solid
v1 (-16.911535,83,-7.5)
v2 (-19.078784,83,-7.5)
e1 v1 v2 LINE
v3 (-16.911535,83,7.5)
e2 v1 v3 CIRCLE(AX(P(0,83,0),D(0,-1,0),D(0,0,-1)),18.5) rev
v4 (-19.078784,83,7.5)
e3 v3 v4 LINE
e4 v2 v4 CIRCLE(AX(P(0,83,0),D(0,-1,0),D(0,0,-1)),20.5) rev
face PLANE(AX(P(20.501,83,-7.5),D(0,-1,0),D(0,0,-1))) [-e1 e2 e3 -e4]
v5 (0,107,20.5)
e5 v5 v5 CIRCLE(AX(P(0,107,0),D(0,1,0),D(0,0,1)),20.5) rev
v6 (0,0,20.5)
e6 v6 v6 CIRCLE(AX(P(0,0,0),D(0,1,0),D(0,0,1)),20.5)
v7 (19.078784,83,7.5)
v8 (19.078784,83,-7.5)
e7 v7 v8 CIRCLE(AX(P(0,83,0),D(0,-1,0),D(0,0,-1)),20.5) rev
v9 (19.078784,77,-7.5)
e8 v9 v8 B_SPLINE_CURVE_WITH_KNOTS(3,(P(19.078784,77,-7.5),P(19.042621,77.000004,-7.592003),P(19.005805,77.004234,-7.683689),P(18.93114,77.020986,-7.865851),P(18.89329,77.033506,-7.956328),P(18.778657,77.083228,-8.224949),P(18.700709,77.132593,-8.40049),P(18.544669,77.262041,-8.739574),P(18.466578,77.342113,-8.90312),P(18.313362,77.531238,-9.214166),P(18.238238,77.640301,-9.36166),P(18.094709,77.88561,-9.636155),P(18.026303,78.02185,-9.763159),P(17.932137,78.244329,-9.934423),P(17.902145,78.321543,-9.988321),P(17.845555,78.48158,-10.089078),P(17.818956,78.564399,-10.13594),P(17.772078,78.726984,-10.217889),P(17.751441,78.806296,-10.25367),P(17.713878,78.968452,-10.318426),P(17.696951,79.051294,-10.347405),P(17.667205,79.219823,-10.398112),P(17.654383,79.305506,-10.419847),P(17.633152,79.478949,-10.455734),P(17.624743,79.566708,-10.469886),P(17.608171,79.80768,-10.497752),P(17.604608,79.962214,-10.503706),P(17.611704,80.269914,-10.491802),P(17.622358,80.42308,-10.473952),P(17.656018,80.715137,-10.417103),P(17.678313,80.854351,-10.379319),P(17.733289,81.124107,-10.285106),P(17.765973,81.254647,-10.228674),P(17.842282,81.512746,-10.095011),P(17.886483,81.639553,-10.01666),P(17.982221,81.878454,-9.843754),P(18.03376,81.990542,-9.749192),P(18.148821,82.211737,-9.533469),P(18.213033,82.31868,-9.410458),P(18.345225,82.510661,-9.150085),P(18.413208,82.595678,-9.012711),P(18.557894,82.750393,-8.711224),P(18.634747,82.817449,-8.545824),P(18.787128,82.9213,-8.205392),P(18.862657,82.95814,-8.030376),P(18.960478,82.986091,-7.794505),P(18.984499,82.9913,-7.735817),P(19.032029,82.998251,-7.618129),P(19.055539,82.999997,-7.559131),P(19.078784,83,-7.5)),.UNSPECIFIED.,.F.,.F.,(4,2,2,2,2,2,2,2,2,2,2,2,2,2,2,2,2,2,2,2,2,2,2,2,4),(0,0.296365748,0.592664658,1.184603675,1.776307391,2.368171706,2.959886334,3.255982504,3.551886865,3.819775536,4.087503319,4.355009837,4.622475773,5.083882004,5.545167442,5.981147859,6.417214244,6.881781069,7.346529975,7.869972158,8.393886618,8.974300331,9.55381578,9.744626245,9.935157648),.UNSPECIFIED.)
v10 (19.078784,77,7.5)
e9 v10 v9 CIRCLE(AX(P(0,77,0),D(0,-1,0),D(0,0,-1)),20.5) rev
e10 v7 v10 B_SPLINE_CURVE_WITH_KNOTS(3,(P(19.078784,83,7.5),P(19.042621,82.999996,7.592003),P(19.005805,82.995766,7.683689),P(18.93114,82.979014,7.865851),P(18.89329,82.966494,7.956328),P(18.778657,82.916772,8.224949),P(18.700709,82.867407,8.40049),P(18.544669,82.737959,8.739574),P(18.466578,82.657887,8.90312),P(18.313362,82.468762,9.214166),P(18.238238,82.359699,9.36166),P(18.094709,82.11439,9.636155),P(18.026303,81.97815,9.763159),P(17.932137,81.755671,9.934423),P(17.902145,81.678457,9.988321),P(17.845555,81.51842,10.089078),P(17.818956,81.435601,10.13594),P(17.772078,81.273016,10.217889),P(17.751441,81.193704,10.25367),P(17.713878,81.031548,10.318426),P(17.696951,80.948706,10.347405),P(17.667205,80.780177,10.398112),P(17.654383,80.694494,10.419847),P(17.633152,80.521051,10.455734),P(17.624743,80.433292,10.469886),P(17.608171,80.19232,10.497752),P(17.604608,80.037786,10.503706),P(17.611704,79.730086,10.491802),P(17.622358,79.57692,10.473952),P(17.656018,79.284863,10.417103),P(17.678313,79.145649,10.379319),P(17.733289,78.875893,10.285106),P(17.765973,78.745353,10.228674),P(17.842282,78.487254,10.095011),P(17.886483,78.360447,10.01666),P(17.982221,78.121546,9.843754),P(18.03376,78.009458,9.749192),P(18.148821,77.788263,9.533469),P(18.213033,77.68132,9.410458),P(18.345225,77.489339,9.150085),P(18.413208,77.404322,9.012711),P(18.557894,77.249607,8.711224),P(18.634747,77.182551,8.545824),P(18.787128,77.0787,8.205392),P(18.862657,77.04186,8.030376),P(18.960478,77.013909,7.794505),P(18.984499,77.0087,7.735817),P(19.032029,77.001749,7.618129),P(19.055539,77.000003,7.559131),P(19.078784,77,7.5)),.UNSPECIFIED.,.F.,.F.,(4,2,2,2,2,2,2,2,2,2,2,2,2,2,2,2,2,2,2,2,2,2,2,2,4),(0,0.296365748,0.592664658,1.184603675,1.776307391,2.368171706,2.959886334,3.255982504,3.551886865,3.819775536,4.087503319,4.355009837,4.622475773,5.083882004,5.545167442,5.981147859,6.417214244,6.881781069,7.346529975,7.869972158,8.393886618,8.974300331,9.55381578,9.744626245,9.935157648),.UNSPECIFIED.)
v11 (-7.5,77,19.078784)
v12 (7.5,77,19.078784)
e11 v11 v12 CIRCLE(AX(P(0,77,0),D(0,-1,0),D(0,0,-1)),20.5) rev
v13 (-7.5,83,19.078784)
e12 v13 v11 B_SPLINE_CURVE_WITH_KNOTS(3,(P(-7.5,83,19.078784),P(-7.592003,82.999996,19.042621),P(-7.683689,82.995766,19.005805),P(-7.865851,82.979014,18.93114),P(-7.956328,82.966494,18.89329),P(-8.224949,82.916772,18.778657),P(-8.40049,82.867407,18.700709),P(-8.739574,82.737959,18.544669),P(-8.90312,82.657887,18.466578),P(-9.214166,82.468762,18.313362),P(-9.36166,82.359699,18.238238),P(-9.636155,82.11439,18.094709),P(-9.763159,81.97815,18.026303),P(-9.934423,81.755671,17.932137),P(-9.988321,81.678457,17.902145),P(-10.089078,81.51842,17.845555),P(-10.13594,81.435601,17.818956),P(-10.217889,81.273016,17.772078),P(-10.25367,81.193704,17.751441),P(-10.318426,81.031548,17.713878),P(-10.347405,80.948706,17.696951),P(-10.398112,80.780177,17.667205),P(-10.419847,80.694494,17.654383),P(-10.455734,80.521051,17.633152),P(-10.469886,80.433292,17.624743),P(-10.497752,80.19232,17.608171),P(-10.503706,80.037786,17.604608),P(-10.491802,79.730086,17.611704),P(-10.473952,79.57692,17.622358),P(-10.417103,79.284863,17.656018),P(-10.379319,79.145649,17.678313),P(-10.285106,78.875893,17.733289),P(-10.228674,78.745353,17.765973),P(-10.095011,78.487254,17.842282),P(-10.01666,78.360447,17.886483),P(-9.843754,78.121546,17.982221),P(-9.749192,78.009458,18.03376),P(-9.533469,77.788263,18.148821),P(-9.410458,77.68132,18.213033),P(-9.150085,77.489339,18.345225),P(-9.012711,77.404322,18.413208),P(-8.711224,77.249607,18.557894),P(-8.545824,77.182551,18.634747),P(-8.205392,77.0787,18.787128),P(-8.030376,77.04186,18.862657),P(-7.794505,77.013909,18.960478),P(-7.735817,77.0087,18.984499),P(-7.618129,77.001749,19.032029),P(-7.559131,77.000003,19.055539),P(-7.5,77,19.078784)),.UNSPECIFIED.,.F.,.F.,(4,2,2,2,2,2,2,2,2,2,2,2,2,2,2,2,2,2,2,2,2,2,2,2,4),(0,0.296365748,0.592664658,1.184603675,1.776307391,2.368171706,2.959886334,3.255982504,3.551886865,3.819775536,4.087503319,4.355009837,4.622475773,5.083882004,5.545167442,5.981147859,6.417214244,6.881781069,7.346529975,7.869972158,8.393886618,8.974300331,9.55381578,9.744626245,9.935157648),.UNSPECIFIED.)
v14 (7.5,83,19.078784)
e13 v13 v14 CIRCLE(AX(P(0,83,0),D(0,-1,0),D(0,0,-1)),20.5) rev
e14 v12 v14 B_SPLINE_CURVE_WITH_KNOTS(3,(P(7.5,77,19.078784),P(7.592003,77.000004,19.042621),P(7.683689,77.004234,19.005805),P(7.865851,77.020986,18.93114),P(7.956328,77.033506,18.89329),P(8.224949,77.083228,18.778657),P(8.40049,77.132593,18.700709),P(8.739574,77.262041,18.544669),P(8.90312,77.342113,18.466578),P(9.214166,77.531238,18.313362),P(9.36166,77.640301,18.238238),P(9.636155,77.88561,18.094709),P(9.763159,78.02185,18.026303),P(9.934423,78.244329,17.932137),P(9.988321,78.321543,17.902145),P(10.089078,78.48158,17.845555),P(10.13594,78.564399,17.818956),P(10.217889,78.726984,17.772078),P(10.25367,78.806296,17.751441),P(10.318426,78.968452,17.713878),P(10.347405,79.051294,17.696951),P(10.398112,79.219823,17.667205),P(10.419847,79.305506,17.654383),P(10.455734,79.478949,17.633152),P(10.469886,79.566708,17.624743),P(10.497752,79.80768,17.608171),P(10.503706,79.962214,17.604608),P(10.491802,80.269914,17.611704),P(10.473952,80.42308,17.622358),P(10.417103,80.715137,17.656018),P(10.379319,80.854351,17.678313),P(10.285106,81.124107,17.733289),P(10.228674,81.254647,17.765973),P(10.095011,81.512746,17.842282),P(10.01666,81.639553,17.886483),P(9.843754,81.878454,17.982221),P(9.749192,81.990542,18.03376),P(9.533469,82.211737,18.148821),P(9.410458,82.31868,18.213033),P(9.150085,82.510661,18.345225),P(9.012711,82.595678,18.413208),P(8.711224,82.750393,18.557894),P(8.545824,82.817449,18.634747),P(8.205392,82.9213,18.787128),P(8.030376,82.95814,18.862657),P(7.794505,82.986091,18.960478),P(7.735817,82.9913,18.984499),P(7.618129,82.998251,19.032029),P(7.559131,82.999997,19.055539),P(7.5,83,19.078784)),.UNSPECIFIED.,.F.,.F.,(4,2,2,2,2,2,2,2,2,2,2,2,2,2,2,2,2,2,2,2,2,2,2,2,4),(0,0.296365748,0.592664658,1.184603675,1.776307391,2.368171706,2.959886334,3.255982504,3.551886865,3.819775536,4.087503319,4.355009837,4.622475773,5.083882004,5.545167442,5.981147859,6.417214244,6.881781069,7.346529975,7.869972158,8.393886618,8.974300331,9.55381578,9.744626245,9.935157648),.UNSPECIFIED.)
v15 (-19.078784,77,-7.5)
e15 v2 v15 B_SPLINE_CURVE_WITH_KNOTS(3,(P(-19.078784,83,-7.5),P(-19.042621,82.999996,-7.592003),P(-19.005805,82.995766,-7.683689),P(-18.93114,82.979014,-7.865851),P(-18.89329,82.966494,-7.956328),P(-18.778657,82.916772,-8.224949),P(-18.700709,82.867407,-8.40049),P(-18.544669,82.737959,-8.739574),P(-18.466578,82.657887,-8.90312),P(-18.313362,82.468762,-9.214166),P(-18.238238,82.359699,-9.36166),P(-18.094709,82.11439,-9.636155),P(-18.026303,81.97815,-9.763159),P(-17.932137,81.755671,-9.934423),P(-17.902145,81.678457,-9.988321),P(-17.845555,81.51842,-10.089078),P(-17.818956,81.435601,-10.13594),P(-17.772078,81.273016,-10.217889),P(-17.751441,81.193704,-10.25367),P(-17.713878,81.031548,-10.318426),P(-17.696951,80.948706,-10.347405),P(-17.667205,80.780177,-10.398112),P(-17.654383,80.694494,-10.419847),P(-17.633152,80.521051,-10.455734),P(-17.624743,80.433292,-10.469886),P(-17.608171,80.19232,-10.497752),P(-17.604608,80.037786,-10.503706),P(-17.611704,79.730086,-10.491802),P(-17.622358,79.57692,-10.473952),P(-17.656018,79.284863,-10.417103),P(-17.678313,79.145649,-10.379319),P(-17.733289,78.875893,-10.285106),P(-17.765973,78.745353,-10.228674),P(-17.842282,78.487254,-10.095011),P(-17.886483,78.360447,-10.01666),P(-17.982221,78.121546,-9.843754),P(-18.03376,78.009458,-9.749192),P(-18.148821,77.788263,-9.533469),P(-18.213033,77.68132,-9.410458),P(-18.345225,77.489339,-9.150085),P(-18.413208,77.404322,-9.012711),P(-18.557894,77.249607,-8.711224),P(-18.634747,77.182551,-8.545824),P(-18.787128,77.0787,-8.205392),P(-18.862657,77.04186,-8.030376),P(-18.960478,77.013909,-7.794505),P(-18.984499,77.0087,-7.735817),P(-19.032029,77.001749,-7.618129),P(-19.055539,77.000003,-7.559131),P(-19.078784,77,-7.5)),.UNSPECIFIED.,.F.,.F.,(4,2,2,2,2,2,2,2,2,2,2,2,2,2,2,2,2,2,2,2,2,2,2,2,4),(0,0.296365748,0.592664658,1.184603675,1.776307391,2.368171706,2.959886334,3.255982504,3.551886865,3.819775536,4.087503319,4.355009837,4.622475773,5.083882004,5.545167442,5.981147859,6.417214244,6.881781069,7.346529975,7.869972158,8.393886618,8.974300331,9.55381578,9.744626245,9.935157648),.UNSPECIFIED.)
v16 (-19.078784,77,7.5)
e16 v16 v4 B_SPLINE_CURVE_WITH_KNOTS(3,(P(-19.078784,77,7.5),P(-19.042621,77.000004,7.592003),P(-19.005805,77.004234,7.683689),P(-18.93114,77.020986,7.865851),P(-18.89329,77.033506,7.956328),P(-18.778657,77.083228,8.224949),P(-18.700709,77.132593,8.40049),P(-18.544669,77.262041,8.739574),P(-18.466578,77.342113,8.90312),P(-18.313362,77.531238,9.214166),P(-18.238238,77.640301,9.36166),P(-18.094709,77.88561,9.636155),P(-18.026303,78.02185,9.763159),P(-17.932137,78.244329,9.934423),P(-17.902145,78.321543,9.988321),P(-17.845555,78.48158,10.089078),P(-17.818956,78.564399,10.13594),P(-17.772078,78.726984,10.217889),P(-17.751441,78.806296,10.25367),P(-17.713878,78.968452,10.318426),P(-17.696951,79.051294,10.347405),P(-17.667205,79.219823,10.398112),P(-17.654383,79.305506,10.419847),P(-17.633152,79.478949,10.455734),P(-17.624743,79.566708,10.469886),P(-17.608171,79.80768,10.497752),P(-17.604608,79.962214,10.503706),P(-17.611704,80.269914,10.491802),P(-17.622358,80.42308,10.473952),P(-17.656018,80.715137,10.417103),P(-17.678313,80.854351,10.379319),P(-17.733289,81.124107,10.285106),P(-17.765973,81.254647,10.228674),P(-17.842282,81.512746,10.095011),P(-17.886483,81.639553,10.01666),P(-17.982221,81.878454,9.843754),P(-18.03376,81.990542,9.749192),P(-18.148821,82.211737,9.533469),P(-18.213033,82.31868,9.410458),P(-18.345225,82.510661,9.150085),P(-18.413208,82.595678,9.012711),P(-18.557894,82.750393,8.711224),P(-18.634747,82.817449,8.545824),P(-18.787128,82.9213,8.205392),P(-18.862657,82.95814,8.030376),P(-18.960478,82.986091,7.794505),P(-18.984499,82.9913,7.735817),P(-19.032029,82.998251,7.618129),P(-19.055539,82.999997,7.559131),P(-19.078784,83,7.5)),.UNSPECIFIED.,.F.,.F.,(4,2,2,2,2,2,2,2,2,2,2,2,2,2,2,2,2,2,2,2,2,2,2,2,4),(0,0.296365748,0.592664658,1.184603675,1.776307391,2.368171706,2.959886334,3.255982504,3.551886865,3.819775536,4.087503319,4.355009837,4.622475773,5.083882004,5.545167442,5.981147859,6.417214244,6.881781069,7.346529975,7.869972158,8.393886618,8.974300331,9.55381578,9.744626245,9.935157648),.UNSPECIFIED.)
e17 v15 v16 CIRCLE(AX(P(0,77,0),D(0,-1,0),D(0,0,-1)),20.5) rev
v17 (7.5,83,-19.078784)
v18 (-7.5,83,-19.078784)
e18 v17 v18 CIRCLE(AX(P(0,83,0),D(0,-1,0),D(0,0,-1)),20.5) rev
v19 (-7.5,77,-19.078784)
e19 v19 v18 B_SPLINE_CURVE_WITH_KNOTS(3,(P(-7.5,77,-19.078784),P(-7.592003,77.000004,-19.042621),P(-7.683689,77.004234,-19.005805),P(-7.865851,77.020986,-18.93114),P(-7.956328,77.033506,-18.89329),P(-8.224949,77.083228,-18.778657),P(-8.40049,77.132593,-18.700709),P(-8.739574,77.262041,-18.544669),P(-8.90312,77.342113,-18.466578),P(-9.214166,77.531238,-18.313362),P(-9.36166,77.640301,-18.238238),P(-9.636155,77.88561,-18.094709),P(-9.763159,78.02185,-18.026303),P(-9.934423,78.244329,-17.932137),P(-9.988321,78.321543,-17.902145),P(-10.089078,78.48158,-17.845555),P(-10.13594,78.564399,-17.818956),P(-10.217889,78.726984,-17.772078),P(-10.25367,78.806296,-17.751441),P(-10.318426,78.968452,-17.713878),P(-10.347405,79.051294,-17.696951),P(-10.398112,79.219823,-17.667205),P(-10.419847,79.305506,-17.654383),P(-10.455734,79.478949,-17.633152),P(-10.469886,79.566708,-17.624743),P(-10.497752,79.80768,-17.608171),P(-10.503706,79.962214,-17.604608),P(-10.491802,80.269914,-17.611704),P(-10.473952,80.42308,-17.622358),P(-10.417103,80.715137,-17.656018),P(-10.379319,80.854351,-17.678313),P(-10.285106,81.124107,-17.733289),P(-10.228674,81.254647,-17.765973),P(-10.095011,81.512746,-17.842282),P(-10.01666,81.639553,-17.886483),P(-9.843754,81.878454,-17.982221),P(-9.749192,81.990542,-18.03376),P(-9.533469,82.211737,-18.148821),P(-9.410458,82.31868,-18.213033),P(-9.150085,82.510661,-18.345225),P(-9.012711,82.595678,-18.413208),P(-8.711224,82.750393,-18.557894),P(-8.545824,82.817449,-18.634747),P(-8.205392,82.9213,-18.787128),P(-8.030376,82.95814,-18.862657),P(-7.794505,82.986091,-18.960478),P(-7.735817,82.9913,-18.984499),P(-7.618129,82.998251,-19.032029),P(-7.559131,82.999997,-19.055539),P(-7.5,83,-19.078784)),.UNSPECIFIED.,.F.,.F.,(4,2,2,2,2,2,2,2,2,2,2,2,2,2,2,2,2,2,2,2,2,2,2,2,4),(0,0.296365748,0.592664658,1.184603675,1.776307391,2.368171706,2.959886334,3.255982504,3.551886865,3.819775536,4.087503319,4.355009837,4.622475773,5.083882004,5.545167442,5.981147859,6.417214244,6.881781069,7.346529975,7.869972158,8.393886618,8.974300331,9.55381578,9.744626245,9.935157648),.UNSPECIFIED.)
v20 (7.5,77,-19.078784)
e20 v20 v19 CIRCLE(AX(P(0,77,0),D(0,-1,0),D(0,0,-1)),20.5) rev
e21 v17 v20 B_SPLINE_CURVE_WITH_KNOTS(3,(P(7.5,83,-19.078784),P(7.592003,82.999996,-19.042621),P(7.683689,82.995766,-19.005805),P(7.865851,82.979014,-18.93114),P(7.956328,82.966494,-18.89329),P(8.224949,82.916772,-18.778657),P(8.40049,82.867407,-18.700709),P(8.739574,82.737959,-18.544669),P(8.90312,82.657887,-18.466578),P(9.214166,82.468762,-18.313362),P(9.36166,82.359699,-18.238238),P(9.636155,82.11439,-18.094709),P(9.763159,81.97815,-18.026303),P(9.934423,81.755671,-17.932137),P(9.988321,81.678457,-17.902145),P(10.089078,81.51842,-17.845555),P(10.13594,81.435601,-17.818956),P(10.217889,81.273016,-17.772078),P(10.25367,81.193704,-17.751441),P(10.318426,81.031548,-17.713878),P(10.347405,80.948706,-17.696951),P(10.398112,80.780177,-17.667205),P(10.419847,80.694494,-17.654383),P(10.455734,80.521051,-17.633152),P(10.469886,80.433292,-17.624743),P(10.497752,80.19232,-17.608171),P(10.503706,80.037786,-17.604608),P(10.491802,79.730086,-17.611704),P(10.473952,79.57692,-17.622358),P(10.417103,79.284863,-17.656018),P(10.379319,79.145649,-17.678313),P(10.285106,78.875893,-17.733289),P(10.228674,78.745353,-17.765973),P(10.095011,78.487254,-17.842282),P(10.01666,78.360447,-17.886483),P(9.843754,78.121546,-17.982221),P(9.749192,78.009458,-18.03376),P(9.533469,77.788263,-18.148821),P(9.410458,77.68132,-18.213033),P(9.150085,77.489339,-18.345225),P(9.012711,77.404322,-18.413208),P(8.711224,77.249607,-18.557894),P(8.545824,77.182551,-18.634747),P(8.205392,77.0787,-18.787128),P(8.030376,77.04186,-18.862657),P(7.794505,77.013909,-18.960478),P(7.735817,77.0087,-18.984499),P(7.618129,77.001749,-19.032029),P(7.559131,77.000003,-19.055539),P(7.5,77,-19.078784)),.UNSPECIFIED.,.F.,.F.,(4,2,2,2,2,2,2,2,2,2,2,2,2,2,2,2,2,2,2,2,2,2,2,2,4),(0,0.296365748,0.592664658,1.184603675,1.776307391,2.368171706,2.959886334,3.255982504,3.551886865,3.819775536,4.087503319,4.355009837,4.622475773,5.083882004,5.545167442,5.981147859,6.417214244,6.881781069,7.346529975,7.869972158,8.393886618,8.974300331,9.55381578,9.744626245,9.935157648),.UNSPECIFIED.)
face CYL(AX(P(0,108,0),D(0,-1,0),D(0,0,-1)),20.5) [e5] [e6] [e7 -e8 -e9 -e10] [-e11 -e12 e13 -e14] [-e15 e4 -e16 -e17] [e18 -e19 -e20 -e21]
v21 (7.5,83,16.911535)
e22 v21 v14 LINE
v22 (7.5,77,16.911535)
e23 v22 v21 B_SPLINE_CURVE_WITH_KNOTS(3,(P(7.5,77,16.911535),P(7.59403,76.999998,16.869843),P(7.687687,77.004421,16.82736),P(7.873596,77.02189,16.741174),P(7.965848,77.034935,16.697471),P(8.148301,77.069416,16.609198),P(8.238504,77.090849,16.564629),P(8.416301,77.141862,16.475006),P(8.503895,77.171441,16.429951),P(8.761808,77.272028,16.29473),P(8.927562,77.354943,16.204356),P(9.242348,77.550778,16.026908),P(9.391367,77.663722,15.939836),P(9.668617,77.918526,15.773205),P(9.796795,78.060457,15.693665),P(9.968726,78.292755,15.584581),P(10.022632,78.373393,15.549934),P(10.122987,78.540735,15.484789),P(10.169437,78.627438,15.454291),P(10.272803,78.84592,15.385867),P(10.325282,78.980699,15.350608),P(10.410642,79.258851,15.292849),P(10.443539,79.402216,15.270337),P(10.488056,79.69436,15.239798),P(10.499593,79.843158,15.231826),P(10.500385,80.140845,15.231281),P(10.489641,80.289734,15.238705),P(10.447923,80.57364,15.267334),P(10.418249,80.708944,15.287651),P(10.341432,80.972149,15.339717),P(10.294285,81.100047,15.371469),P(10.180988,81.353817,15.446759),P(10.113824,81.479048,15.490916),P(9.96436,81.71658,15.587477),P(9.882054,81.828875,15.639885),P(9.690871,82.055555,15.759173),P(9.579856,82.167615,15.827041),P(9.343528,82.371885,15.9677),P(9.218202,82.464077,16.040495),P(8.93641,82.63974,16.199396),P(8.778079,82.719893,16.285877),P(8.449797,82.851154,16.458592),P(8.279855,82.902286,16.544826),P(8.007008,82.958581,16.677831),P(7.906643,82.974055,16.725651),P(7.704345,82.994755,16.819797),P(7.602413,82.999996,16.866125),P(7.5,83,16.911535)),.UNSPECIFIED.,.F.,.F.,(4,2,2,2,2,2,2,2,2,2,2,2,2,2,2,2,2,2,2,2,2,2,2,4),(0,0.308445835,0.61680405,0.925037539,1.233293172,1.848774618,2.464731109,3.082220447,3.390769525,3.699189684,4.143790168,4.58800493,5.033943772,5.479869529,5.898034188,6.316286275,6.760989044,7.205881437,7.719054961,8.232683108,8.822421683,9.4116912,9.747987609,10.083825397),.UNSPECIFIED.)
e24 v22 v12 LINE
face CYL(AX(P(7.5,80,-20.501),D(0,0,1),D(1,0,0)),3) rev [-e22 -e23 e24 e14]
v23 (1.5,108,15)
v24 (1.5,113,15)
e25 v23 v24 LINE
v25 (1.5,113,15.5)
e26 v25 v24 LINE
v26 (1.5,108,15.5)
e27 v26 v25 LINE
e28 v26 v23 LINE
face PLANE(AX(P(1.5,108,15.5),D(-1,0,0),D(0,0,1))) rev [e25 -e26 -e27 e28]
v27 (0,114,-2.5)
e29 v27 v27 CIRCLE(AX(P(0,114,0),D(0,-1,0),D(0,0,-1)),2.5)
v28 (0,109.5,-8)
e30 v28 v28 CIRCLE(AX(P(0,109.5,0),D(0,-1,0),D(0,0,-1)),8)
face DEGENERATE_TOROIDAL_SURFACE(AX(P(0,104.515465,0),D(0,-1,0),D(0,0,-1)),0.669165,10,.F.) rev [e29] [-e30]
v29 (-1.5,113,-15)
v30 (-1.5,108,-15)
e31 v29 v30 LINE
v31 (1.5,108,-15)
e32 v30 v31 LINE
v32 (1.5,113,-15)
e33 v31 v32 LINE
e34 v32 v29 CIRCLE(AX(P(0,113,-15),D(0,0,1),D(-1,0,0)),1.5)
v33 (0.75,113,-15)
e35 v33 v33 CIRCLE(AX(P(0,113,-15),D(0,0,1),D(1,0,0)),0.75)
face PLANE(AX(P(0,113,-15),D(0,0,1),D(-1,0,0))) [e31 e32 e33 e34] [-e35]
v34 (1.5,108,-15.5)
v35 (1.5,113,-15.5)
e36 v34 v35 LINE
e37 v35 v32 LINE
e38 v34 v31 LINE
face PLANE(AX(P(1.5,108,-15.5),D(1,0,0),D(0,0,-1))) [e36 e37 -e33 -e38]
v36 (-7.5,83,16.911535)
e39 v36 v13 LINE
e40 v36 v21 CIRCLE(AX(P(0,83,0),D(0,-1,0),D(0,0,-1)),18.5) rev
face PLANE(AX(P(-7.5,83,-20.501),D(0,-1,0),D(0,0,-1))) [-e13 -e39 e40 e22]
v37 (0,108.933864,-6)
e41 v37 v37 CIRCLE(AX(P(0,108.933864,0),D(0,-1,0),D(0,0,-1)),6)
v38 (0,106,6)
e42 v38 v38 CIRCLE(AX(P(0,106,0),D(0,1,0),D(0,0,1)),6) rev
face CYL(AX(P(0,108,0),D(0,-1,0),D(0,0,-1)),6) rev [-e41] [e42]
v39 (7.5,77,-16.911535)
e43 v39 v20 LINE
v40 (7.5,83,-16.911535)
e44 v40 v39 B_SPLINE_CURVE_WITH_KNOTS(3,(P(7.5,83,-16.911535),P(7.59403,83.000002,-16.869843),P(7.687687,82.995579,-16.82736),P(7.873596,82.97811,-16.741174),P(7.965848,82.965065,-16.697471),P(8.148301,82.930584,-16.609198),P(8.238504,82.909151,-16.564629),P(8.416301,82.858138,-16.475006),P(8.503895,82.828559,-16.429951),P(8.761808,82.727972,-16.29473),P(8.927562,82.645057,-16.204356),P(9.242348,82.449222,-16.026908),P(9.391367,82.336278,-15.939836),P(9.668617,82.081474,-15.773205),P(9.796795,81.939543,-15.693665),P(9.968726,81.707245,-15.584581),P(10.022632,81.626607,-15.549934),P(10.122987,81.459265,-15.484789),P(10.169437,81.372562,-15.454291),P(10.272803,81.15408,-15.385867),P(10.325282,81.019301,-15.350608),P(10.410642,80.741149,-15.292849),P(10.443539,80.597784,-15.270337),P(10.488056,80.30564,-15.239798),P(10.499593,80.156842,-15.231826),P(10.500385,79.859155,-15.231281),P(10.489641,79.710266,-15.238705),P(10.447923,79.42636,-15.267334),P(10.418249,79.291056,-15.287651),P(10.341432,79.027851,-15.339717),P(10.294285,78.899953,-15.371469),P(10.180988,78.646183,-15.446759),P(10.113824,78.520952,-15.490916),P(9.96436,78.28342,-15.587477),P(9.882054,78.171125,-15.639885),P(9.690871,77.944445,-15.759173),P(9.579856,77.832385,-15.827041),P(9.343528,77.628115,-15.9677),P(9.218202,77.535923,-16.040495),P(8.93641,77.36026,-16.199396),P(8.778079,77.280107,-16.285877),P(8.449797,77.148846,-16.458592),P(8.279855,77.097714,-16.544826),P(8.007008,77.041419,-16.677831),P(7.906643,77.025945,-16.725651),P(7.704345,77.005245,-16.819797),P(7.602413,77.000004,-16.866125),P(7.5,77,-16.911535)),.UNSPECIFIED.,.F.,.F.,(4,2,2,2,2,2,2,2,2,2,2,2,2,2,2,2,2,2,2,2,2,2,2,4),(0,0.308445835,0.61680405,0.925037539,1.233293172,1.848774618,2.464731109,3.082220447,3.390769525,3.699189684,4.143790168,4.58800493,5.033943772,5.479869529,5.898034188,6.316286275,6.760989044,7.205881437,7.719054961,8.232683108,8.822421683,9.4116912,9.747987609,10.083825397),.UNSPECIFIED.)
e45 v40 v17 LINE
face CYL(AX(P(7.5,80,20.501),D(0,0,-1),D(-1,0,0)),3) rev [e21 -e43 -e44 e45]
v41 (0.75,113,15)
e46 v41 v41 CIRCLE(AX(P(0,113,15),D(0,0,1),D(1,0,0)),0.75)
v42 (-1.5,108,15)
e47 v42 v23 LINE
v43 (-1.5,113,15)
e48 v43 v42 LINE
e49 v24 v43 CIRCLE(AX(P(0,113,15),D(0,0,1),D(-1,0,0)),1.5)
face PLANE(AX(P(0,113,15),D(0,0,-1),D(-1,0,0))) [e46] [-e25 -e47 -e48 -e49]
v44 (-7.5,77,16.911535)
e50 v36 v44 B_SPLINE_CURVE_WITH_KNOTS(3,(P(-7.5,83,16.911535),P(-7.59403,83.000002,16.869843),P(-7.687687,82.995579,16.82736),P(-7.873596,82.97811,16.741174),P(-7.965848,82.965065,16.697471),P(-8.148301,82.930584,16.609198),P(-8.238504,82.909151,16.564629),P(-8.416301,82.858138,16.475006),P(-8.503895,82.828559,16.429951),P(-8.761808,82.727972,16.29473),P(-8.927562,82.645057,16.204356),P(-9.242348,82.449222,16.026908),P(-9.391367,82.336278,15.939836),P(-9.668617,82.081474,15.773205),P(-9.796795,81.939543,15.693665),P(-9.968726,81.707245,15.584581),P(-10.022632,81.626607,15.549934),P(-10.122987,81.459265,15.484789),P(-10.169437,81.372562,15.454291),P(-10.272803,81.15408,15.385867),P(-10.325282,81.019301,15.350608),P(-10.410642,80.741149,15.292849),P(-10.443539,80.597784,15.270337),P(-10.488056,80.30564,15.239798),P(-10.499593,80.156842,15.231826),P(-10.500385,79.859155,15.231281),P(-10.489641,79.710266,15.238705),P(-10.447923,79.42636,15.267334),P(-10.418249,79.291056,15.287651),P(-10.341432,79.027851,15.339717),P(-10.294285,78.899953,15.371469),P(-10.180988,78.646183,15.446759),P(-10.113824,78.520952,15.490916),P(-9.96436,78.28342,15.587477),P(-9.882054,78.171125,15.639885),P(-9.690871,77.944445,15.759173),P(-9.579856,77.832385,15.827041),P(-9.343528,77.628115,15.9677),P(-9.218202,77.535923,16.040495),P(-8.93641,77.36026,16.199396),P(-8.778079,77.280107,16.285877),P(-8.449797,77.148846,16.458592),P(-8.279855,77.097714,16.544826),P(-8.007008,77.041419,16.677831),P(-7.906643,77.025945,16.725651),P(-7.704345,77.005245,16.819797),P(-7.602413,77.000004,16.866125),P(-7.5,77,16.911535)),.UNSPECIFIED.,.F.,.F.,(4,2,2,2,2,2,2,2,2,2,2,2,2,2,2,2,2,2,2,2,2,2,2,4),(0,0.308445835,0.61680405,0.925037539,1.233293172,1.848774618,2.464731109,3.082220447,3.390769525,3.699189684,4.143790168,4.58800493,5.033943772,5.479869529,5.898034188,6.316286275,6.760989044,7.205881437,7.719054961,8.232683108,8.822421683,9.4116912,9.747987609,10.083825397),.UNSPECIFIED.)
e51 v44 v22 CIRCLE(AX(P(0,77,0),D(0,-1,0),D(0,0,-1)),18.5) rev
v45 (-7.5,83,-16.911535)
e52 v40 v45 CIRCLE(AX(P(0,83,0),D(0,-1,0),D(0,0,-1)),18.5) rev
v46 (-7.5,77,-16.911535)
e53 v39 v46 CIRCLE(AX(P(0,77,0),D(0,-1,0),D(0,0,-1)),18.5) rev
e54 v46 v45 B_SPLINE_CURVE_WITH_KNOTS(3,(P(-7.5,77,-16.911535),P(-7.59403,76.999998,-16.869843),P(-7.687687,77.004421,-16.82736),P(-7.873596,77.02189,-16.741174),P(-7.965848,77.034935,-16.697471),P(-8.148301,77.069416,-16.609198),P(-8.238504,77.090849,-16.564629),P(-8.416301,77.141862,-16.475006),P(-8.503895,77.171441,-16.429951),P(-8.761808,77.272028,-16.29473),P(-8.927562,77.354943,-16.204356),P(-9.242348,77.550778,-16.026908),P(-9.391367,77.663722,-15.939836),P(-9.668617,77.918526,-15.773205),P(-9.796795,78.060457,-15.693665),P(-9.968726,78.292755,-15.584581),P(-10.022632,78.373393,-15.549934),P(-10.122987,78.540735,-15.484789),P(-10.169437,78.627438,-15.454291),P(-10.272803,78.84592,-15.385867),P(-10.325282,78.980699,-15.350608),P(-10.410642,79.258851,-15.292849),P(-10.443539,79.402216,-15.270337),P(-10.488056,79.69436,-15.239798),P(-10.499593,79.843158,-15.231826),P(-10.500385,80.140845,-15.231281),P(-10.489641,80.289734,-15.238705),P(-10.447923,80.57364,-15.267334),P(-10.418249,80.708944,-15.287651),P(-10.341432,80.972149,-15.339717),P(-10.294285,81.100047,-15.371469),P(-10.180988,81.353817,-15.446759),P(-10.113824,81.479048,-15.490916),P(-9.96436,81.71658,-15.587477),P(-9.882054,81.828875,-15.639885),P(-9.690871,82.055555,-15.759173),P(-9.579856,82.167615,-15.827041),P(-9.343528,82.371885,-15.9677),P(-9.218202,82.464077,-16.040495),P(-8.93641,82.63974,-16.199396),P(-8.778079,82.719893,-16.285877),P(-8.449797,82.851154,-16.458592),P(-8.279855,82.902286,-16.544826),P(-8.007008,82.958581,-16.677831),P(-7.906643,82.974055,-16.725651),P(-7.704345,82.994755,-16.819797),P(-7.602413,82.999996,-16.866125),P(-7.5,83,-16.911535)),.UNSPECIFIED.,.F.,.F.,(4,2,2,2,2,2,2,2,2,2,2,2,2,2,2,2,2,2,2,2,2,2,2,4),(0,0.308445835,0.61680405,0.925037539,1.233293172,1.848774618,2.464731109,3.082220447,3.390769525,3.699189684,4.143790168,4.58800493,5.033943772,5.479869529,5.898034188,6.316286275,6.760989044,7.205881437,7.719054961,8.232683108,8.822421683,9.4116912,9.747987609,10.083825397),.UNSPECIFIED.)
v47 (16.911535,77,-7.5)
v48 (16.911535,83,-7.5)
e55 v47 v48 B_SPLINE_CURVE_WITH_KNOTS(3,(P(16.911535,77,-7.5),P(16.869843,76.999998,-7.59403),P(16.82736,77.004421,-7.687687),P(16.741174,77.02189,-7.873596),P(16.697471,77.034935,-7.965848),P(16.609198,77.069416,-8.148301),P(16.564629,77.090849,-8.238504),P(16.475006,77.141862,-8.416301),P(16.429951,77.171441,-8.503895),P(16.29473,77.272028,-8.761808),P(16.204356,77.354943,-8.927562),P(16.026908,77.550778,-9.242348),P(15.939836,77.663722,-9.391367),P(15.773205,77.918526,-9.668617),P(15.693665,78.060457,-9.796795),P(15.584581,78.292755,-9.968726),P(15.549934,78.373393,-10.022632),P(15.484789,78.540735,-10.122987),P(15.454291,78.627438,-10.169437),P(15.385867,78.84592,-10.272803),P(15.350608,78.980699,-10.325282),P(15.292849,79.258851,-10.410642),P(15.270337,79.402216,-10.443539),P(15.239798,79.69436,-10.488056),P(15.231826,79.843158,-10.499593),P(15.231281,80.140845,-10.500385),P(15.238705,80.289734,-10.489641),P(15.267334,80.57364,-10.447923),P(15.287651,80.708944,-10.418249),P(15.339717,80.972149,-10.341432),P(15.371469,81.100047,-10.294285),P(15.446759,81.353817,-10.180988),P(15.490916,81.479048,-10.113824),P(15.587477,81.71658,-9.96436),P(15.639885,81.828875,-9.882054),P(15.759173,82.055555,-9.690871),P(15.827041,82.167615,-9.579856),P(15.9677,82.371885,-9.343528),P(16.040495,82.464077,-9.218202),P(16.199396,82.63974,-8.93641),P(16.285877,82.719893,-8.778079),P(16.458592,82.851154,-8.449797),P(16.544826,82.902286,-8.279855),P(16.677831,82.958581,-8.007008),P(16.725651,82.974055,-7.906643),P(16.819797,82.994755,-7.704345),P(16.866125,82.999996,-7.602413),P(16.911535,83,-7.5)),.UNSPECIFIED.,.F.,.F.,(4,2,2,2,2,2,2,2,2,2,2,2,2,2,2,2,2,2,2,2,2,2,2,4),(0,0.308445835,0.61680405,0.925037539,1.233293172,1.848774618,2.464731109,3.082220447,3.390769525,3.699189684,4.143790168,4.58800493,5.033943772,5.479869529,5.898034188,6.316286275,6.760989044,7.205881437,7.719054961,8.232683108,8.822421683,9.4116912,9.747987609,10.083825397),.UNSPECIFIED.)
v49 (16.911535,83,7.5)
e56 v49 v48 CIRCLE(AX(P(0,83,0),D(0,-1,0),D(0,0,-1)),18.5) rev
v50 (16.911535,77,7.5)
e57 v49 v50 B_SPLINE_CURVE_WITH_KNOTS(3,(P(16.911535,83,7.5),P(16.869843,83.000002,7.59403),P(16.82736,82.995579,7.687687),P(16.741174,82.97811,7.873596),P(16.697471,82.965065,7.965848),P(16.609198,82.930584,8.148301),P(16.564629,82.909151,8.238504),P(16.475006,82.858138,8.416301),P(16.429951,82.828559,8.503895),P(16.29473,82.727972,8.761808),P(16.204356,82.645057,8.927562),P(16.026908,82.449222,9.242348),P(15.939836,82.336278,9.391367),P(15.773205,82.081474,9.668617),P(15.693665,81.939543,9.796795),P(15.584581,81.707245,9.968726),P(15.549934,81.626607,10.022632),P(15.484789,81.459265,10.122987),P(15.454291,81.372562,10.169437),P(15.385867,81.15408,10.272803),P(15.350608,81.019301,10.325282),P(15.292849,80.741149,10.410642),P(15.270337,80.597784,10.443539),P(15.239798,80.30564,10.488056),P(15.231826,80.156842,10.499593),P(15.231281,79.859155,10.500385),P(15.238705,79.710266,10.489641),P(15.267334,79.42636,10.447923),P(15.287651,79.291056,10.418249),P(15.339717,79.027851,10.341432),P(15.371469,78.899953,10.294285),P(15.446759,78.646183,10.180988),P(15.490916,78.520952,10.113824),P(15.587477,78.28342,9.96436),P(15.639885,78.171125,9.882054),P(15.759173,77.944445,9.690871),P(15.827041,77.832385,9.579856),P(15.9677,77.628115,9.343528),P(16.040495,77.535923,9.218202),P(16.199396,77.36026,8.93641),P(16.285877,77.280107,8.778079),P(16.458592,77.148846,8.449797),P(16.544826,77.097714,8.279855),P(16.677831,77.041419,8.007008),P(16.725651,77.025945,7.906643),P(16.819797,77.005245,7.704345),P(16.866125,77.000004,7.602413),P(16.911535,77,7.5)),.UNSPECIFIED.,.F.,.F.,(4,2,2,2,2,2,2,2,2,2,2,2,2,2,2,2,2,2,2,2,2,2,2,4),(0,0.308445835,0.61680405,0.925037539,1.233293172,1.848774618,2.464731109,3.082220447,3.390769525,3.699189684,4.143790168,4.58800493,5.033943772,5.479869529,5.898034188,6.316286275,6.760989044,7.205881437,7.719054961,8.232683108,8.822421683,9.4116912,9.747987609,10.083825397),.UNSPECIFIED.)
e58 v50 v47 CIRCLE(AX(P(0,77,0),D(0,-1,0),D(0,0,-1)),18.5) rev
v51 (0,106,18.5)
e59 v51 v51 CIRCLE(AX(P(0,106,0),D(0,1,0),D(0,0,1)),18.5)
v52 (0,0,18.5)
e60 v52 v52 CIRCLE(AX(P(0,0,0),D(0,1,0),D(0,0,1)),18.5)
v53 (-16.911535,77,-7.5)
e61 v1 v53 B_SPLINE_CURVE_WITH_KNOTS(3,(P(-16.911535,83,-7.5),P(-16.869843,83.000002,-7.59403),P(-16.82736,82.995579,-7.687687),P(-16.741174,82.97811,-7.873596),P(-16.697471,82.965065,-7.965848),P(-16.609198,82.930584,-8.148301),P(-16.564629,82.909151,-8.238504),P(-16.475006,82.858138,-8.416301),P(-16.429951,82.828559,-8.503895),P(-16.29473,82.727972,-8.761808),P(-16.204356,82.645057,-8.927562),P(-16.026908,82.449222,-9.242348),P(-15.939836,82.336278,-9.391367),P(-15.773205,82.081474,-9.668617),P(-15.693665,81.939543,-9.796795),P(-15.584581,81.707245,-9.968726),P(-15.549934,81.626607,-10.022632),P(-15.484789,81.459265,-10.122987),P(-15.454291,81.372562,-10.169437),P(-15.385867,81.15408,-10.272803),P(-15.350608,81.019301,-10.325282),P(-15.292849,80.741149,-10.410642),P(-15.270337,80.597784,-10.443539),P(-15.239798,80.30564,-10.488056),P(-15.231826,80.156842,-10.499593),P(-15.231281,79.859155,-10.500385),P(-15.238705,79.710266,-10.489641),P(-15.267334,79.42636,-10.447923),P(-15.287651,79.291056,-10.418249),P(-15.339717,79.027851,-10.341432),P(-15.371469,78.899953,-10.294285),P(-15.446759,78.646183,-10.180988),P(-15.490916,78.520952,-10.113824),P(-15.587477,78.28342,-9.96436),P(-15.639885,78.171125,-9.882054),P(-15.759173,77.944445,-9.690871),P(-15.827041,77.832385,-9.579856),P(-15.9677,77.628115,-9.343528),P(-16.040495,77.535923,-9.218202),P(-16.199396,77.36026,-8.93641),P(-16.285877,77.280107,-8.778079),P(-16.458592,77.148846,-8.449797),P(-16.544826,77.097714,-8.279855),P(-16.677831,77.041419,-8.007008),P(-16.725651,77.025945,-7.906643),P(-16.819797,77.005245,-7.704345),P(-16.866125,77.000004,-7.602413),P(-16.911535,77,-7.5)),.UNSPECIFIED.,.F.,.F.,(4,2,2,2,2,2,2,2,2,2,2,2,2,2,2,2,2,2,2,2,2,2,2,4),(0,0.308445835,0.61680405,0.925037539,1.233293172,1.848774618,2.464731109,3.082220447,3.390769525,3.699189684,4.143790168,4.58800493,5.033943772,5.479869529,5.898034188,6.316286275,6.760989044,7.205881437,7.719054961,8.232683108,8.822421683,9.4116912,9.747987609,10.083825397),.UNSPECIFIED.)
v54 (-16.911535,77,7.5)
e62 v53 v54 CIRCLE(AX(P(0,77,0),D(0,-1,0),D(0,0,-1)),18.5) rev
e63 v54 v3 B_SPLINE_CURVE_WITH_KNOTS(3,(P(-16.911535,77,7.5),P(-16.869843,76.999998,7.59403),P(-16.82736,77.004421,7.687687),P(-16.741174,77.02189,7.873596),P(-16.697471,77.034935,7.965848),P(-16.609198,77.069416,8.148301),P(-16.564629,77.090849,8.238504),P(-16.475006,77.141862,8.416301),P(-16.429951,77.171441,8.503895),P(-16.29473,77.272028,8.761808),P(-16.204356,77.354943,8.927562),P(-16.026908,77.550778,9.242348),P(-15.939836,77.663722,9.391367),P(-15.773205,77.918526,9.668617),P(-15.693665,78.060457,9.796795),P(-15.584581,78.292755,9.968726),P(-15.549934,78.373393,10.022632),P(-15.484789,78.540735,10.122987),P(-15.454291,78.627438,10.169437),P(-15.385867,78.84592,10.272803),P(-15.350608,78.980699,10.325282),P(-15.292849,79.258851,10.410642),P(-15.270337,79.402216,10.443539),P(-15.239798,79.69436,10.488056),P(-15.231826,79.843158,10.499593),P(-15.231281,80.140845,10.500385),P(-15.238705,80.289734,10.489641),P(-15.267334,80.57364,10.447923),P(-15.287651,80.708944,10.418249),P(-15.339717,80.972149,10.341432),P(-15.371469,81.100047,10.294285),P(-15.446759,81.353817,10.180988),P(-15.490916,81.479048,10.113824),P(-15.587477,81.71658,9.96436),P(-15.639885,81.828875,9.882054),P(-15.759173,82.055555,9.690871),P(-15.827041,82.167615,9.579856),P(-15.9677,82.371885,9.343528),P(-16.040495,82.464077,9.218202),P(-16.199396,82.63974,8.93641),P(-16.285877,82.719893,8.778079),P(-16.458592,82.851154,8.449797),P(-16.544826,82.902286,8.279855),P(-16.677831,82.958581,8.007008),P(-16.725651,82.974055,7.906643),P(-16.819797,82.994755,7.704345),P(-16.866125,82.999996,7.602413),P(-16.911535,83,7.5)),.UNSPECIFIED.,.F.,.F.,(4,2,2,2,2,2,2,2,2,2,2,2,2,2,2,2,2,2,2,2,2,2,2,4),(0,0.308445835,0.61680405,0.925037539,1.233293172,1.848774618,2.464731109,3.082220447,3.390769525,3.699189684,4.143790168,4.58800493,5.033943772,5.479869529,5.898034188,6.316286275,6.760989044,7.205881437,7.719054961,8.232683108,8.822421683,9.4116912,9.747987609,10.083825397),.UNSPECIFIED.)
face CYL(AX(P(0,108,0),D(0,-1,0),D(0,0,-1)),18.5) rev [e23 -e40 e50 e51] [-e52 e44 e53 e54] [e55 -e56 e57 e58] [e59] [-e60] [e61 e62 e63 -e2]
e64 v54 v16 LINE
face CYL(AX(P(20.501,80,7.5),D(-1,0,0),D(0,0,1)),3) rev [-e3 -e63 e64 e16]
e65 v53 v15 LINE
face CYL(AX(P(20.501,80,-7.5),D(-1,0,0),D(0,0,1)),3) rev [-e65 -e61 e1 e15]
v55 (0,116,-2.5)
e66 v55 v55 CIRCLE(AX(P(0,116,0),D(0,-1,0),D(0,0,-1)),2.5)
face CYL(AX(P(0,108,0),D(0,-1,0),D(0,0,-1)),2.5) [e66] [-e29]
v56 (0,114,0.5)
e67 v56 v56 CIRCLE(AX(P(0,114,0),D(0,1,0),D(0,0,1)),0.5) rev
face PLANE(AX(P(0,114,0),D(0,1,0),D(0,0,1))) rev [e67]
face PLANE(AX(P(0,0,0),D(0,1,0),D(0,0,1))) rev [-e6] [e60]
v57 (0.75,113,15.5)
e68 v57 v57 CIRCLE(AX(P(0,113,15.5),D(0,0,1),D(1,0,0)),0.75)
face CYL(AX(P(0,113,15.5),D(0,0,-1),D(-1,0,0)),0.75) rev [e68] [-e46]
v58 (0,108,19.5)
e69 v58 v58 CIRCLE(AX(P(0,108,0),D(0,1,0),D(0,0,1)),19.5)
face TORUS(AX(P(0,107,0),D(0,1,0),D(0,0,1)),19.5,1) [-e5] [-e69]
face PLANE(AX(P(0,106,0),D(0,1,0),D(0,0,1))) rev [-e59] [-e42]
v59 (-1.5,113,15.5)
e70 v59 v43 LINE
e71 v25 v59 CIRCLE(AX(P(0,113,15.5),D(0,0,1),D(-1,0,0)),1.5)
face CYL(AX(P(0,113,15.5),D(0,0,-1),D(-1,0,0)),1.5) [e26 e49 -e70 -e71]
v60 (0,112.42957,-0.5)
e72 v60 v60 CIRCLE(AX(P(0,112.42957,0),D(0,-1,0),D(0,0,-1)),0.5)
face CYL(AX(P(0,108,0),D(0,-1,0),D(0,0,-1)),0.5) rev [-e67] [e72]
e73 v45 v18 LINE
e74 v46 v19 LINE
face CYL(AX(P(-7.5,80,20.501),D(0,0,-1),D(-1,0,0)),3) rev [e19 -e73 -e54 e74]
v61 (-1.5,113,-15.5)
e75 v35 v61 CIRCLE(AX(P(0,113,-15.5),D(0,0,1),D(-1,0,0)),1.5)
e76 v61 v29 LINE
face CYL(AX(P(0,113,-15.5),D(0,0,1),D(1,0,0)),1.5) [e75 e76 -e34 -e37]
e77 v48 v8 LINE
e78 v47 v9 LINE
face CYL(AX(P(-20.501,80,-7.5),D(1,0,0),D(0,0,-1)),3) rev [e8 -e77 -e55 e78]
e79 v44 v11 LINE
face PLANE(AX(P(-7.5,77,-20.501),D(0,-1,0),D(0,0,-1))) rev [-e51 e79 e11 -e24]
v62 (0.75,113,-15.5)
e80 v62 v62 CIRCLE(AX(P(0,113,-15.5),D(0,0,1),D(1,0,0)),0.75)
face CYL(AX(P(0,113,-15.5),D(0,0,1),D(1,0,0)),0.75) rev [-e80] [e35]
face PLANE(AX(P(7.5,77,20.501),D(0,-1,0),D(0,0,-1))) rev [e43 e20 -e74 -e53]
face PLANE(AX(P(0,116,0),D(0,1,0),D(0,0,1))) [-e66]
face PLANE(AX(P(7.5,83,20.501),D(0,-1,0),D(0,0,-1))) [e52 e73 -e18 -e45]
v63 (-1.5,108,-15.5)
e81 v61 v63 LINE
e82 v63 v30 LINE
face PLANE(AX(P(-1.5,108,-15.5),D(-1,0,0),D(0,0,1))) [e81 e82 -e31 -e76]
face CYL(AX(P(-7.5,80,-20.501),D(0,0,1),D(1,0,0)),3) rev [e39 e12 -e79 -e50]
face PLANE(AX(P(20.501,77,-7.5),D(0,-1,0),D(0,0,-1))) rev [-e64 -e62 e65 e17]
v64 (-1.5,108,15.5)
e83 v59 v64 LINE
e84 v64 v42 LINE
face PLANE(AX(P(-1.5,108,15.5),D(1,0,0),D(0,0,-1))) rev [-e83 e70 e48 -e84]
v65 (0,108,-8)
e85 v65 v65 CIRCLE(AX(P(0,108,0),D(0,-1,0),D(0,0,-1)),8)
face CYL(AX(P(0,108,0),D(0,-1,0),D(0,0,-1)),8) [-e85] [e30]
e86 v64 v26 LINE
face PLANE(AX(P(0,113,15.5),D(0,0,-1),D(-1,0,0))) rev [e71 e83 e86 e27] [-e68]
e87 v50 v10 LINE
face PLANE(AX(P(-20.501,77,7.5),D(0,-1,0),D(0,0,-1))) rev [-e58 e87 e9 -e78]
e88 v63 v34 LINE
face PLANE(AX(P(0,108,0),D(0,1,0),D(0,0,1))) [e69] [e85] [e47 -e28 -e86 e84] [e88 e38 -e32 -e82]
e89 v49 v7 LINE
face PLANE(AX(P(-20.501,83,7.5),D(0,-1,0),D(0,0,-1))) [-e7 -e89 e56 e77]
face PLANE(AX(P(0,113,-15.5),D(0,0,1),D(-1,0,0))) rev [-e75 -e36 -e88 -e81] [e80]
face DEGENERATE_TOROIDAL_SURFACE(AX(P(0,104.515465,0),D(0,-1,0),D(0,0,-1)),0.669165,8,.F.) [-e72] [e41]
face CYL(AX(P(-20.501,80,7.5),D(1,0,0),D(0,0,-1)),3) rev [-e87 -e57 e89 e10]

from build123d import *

# Parameters (mm, degrees)
SKETCH1_R               = 20.5
BOSS_EXTRUDE1_DEPTH     = 108
FILLET1_R               = 1
CUT_EXTRUDE1_REACH      = 130.166
CUT_EXTRUDE1_END_RADIUS = 18.5
CIRPATTERN1_COUNT       = 4
SKETCH7_R               = 0.75
BOSS_EXTRUDE2_DEPTH     = 0.5


# Read off the part's stored shape, not the designer's step: Shell1
with BuildPart() as part:
    # Sketch1 → Boss-Extrude1 (new body)
    with BuildSketch(Plane(origin=(0, 0, 0), x_dir=(1, 0, 0), z_dir=(0, 1, 0))):
        with Locations(Location((0, 0, 0), (0, 0, 270))):
            Circle(SKETCH1_R)
    extrude(amount=BOSS_EXTRUDE1_DEPTH)

    # Sketch3 → Revolve1 (revolve)
    with BuildSketch(Plane(origin=(0, 0, 0), x_dir=(0, 0, -1), z_dir=(1, 0, 0))):
        with BuildLine():
            Line((0, 116), (2.5, 116))
            Line((2.5, 116), (2.5, 114))
            ThreePointArc((2.5, 114), (5.663213274, 112.255038446), (8, 109.5))
            Line((8, 109.5), (8, 108))
            Line((8, 108), (0, 108))
            Line((0, 108), (0, 116))
        make_face()
    revolve(axis=Axis((0, 108, 0), (0, 1, 0)))

    # Fillet1
    fillet1_edges = [part.edges().sort_by_distance(p)[0] for p in [
        (0, 108, -20.5),
    ]]
    fillet(fillet1_edges, radius=FILLET1_R)

    # Shell1 outline → Shell1 (revolve, cut)
    with BuildSketch(Plane.XY):
        with BuildLine():
            Line((18.5, 0), (18.5, 106))
            Line((18.5, 106), (6, 106))
            Line((6, 106), (6, 108.933863711))
            ThreePointArc((6, 108.933863711), (3.622087212, 111.267143588), (0.5, 112.429570209))
            Line((0.5, 112.429570209), (0.5, 114))
            Line((0.5, 114), (0, 114))
            Line((0, 114), (0, 0))
            Line((0, 0), (18.5, 0))
        make_face()
    revolve(axis=Axis((0, 0, 0), (0, 1, 0)), mode=Mode.SUBTRACT)

    # Cut-Extrude1: up to this cylinder (the profile starts outside it)
    cut_extrude1_end = Plane(origin=(0, 80, 0), z_dir=(0, -1, 0)) * Cylinder(CUT_EXTRUDE1_END_RADIUS, 298.332, mode=Mode.PRIVATE)
    # Sketch4 → Cut-Extrude1 (cut, up to the surface)
    with BuildSketch(Plane(origin=(30, 0, 0), x_dir=(0, 0, -1), z_dir=(1, 0, 0)), mode=Mode.PRIVATE) as cut_extrude1_sk1:
        with BuildLine():
            Line((-7.5, 83), (7.5, 83))
            ThreePointArc((7.5, 83), (10.5, 80), (7.5, 77))
            Line((7.5, 77), (-7.5, 77))
            ThreePointArc((-7.5, 77), (-10.5, 80), (-7.5, 83))
        make_face()
    cut_extrude1_tool1 = extrude(cut_extrude1_sk1.sketch, amount=-CUT_EXTRUDE1_REACH, mode=Mode.PRIVATE) - cut_extrude1_end
    cut_extrude1 = cut_extrude1_tool1.solids().sort_by_distance((30, 80, 0))[0]
    add(cut_extrude1, mode=Mode.SUBTRACT)

    # CirPattern1: Cut-Extrude1 ×4 about axis
    cirpattern1_axis = Axis((0, 0, 0), (0, 1, 0))
    for i in range(1, CIRPATTERN1_COUNT):
        add(cut_extrude1.rotate(cirpattern1_axis, i * 360 / CIRPATTERN1_COUNT), mode=Mode.SUBTRACT)

    # Sketch7 → Boss-Extrude2 (add)
    with BuildSketch(Plane.XY.offset(15)):
        with BuildLine():
            Line((-1.5, 108), (1.5, 108))
            Line((1.5, 108), (1.5, 113))
            ThreePointArc((1.5, 113), (0, 114.5), (-1.5, 113))
            Line((-1.5, 113), (-1.5, 108))
        make_face()
        with Locations((0, 113)):
            Circle(SKETCH7_R, mode=Mode.SUBTRACT)
    boss_extrude2 = extrude(amount=BOSS_EXTRUDE2_DEPTH)

    # Mirror1: Boss-Extrude2 across plane
    add(boss_extrude2.mirror(Plane.XY))


solid = part.part
